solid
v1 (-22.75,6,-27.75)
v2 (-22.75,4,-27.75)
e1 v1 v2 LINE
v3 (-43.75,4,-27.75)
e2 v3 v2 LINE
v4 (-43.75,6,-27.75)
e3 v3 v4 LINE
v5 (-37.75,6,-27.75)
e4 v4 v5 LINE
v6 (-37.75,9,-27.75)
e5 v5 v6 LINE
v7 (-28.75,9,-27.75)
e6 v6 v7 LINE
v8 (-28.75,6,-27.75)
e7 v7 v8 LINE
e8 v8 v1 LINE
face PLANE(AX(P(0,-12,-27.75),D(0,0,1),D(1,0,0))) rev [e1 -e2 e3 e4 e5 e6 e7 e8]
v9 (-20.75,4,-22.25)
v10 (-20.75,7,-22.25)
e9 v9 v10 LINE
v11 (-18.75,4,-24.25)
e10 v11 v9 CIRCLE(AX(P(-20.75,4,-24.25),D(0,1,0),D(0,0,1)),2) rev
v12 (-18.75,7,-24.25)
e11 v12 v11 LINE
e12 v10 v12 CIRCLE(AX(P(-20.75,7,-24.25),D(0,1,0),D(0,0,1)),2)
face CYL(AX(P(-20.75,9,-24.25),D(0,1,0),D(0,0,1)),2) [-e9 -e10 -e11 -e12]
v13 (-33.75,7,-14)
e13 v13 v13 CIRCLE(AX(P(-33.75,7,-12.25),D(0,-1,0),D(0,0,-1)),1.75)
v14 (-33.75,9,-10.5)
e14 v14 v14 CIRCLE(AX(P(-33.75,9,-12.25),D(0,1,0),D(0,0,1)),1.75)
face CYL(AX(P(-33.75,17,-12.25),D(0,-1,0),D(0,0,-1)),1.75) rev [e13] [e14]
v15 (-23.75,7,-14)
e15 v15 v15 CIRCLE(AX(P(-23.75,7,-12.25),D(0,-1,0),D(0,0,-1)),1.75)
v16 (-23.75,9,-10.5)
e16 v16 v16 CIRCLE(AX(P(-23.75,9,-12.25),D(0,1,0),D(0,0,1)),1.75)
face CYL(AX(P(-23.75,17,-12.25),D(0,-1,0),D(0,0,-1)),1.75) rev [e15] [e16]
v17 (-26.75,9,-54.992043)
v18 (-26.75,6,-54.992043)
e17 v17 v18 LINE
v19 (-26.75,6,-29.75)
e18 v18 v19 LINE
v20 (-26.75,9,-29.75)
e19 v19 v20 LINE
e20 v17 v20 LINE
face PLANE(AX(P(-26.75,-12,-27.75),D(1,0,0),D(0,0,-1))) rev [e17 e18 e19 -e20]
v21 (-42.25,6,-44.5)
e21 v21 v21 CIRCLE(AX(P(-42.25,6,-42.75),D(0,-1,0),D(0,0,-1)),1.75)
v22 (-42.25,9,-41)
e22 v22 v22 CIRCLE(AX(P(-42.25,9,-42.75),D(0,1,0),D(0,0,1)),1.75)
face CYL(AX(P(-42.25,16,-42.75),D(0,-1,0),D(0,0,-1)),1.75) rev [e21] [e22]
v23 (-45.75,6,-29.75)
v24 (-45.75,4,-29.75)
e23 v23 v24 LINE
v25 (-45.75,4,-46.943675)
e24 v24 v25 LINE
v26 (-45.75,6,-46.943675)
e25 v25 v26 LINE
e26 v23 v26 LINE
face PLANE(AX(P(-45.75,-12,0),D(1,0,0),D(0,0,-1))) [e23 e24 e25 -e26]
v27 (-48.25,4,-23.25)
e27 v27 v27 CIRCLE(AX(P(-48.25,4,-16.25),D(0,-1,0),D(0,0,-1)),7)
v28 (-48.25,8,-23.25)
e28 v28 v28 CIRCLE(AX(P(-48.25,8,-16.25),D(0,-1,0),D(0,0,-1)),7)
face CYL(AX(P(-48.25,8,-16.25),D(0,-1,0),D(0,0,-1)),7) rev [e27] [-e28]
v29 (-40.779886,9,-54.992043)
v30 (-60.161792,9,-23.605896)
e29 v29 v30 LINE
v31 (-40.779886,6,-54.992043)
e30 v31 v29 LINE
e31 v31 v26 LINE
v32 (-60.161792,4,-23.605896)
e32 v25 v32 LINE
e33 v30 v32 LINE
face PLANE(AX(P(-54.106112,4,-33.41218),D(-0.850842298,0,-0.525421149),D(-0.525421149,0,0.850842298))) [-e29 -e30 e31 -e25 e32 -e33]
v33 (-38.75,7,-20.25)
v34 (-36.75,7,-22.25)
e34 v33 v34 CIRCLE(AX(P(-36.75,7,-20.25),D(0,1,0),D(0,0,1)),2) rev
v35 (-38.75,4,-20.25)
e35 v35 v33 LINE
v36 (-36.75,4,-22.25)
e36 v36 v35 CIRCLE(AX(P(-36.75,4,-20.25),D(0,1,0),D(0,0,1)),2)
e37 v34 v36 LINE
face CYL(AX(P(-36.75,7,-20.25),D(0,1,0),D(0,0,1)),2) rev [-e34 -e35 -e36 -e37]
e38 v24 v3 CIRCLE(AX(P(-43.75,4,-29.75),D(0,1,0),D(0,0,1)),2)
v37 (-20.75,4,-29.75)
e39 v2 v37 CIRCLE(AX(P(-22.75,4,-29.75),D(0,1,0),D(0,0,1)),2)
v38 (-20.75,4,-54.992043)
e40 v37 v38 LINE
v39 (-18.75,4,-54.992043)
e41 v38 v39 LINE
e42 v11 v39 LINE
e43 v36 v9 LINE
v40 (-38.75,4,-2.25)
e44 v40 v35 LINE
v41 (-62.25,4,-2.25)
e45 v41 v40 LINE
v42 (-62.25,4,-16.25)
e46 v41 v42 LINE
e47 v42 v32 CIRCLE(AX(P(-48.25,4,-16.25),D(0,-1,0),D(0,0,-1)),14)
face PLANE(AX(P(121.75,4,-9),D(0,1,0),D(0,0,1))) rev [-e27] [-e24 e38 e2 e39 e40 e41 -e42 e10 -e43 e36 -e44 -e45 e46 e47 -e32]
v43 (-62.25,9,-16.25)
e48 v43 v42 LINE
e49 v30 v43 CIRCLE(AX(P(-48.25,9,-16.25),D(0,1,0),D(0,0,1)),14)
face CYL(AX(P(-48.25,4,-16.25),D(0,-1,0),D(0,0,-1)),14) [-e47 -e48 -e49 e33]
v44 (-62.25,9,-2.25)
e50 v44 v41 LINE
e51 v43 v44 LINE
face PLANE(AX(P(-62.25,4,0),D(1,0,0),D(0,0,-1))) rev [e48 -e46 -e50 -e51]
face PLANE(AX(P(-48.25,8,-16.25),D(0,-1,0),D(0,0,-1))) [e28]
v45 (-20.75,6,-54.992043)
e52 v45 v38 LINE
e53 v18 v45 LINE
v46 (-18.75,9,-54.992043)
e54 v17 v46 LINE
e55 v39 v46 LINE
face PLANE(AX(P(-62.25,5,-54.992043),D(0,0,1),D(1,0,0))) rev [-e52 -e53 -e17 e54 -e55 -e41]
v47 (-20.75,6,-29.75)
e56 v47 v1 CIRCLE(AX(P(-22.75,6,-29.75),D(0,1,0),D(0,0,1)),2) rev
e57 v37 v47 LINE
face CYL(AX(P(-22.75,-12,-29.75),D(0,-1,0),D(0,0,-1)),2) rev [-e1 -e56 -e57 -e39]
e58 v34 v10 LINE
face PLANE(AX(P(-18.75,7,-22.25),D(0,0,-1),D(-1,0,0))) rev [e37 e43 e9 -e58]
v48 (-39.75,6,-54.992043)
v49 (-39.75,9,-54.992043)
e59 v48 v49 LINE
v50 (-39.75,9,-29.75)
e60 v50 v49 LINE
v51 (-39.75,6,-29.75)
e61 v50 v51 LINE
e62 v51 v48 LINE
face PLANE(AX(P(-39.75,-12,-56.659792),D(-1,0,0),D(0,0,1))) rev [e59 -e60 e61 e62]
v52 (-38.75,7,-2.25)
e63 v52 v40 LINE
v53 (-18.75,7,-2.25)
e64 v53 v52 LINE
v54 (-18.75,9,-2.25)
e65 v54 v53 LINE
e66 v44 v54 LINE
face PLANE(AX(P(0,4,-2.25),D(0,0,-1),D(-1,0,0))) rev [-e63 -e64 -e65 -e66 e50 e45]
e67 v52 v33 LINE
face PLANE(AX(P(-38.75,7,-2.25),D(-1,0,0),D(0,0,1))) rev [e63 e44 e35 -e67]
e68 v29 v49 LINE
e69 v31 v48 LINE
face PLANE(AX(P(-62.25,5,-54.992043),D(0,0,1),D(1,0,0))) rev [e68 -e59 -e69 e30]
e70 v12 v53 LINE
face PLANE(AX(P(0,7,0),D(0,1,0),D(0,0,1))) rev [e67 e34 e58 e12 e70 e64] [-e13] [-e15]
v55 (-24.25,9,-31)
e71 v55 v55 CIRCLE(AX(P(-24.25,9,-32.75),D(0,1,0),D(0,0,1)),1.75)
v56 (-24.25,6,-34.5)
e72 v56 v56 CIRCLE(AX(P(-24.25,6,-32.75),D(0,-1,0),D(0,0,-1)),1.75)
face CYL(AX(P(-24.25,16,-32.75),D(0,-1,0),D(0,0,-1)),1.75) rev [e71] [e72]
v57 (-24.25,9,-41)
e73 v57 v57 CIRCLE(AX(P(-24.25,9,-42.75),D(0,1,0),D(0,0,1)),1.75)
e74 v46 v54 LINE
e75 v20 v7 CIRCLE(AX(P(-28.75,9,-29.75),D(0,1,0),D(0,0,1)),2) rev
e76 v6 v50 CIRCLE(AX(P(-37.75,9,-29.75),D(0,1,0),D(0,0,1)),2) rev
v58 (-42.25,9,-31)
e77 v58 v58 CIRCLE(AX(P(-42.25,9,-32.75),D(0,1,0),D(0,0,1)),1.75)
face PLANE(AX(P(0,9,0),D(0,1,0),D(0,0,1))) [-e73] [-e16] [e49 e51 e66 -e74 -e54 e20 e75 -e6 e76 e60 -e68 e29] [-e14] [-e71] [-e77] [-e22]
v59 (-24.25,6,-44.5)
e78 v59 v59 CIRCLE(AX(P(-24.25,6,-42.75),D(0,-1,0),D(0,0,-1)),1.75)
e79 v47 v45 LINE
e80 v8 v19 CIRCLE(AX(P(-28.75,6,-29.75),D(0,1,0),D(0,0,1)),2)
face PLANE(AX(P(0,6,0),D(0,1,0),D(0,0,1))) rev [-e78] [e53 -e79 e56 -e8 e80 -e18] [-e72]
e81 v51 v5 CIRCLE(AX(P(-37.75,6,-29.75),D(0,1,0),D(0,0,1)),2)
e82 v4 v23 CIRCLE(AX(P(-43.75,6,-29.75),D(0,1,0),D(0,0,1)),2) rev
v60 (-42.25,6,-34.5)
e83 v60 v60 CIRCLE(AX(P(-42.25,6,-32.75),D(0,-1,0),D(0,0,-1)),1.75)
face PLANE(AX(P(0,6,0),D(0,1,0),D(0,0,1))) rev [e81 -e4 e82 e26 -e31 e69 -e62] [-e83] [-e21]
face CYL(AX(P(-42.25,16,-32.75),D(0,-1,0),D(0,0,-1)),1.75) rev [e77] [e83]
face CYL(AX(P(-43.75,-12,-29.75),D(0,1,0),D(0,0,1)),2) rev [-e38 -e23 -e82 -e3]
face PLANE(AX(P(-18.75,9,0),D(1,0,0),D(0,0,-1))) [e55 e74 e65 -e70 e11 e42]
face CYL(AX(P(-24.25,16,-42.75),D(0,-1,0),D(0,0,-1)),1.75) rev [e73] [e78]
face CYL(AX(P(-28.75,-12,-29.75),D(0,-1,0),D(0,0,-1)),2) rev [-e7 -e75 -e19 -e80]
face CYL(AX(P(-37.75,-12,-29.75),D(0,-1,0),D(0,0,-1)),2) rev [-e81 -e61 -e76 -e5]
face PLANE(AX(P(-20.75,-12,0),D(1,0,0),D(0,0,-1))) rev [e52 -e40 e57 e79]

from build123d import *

# Parameters (mm, degrees)
SKETCH_1_W                = 35
SKETCH_1_H                = 55
EXTRUDE_1_DEPTH           = 1
EXTRUDE_2_DEPTH           = 3
SKETCH_3_R                = 5
CUT_EXTRUDE_1_DEPTH       = 169.569903897
SKETCH_4_R                = 4
CUT_EXTRUDE_2_DEPTH       = 2
SKETCH_5_R                = 2
CUT_EXTRUDE_3_DEPTH       = 2
EXTRUDE_START             = 7
EXTRUDE_3_DEPTH           = 7
CUT_EXTRUDE_START         = -1.5
SKETCH_9_W                = 10
SKETCH_9_H                = 26
CUT_EXTRUDE_4_DEPTH       = 168.318874833
SKETCH_10_R               = 1.5
CUT_EXTRUDE_5_DEPTH       = 194.595583627
EXTRUDE_4_DEPTH           = 3
SKETCH_13_W               = 334.012533363
SKETCH_13_H               = 161.456209481
CUT_EXTRUDE_6_DEPTH       = 10
SKETCH_14_R               = 3.5
CUT_EXTRUDE_7_DEPTH       = 2.5
SKETCH_15_R               = 5
CUT_EXTRUDE_8_DEPTH       = 179.854165453
EXTRUDE_START_2           = 16
EXTRUDE_5_DEPTH           = 16
EXTRUDE_6_DEPTH           = 7
SKETCH_19_W               = 10
SKETCH_19_H               = 26
CUT_EXTRUDE_9_DEPTH       = 180.209193181
SKETCH_20_R               = 1.5
CUT_EXTRUDE_10_DEPTH      = 175.844216376
THREAD_1_PITCH            = 0.6
CUT_EXTRUDE_11_DEPTH      = 181.709193232
SKETCH_22_W               = 13
SKETCH_22_H               = 1.5
CUT_EXTRUDE_12_DEPTH      = 7
SKETCH_23_R               = 5
EXTRUDE_7_DEPTH           = 2
CUT_EXTRUDE_START_2       = -3
CUT_EXTRUDE_15_DEPTH      = 177.762490825
SKETCH_25_R               = 7
CUT_EXTRUDE_16_DEPTH      = 4
CUT_EXTRUDE_17_DEPTH      = 10
SKETCH_27_R               = 1.75
CUT_EXTRUDE_18_DEPTH      = 10
CUT_EXTRUDE_19_DEPTH      = 180.762490825
CUT_EXTRUDE_19_DEPTH_BACK = 60
CUT_EXTRUDE_20_DEPTH      = 2
SKETCH_30_W               = 11.653427307
SKETCH_30_H               = 7.287785495
CUT_EXTRUDE_21_DEPTH      = 193.522031886
SKETCH_31_W               = 3.751946438
SKETCH_31_H               = 6.76496914
CUT_EXTRUDE_22_DEPTH      = 10
SKETCH_32_R               = 1
CUT_EXTRUDE_23_DEPTH      = 10
SKETCH_33_R               = 6.599468503
EXTRUDE_8_DEPTH           = 1
SKETCH_35_W               = 76.825944062
SKETCH_35_H               = 20.911958218
CUT_EXTRUDE_24_DEPTH      = 193.102403623
SKETCH_36_W               = 20
SKETCH_36_H               = 20
CUT_EXTRUDE_25_DEPTH      = 3
SKETCH_37_R               = 1.75
CUT_EXTRUDE_26_DEPTH      = 10
FILLET_1_R                = 2


with BuildPart() as part:
    # Sketch 1 → 凸台-拉伸1 (new body)
    with BuildSketch(Plane(origin=(0, 0, 0), x_dir=(1, 0, 0), z_dir=(0, 1, 0))):
        Rectangle(SKETCH_1_W, SKETCH_1_H)
    extrude(amount=EXTRUDE_1_DEPTH)

    # 草图2 → 凸台-拉伸2 (add)
    with BuildSketch(Plane(origin=(0, 1, 0), x_dir=(1, 0, 0), z_dir=(0, 1, 0))):
        with BuildLine():
            Line((106.75, -2.25), (106.75, 2.25))
            Line((106.75, 2.25), (121.75, 2.25))
            ThreePointArc((121.75, 2.25), (122.922125199, 2.352547667), (124.058635967, 2.65707481))
            Line((124.058635967, 2.65707481), (154.058635967, 13.576181838))
            ThreePointArc((154.058635967, 13.576181838), (158.397452333, 21.091232227), (151.75, 26.669107028))
            Line((151.75, 26.669107028), (-31.447415548, 57.101298968))
            ThreePointArc((-31.447415548, 57.101298968), (-37.800418235, 56.264673928), (-42.609265279, 52.029632639))
            Line((-42.609265279, 52.029632639), (-60.161792173, 23.605896086))
            ThreePointArc((-60.161792173, 23.605896086), (-61.717833724, 20.073278016), (-62.25, 16.25))
            Line((-62.25, 16.25), (-62.25, -16.25))
            ThreePointArc((-62.25, -16.25), (-61.717833724, -20.073278016), (-60.161792173, -23.605896086))
            Line((-60.161792173, -23.605896086), (-42.609265279, -52.029632639))
            ThreePointArc((-42.609265279, -52.029632639), (-37.800418235, -56.264673928), (-31.447415548, -57.101298968))
            Line((-31.447415548, -57.101298968), (151.75, -26.669107028))
            ThreePointArc((151.75, -26.669107028), (158.397452333, -21.091232227), (154.058635967, -13.576181838))
            Line((154.058635967, -13.576181838), (124.058635967, -2.65707481))
            ThreePointArc((124.058635967, -2.65707481), (122.922125199, -2.352547667), (121.75, -2.25))
            Line((121.75, -2.25), (106.75, -2.25))
        make_face()
    extrude(amount=EXTRUDE_2_DEPTH)

    # 草图3 → 切除-拉伸1 (cut, through all)
    with BuildSketch(Plane(origin=(0, 4, 0), x_dir=(1, 0, 0), z_dir=(0, 1, 0))):
        with Locations(Location((-48.25, 16.25, 0), (0, 0, 270))):
            Circle(SKETCH_3_R)
        with Locations(Location((-48.25, -16.25, 0), (0, 0, 270))):
            Circle(SKETCH_3_R)
    extrude(amount=-CUT_EXTRUDE_1_DEPTH, mode=Mode.SUBTRACT)

    # 草图4 → 切除-拉伸2 (cut)
    with BuildSketch(Plane(origin=(0, 4, 0), x_dir=(1, 0, 0), z_dir=(0, 1, 0))):
        with Locations(Location((-33.25, 46.25, 0), (0, 0, 270))):
            Circle(SKETCH_4_R)
        with Locations(Location((-33.25, -46.25, 0), (0, 0, 270))):
            Circle(SKETCH_4_R)
    extrude(amount=-CUT_EXTRUDE_2_DEPTH, mode=Mode.SUBTRACT)

    # 草图5 → 切除-拉伸3 (cut)
    with BuildSketch(Plane(origin=(0, 4, 0), x_dir=(1, 0, 0), z_dir=(0, 1, 0))):
        with Locations(Location((121.75, 9, 0), (0, 0, 270))):
            Circle(SKETCH_5_R)
        with Locations(Location((121.75, -9, 0), (0, 0, 270))):
            Circle(SKETCH_5_R)
        with Locations(Location((151.75, 19.919107028, 0), (0, 0, 270))):
            Circle(SKETCH_5_R)
        with Locations(Location((151.75, -19.919107028, 0), (0, 0, 270))):
            Circle(SKETCH_5_R)
    extrude(amount=-CUT_EXTRUDE_3_DEPTH, mode=Mode.SUBTRACT)

    # 草图8 → 凸台-拉伸3 (add)
    with BuildSketch(Plane.XZ.offset(-1).offset(EXTRUDE_START)):
        with BuildLine():
            Line((-26.75, -26.25), (-39.75, -26.25))
            Line((-39.75, -26.25), (-39.75, -55.124119675))
            ThreePointArc((-39.75, -55.124119675), (-35.798281322, -56.950759894), (-31.447415548, -57.101298968))
            Line((-31.447415548, -57.101298968), (-26.75, -56.320978726))
            Line((-26.75, -56.320978726), (-26.75, -26.25))
        make_face()
    extrude_3 = extrude(amount=-EXTRUDE_3_DEPTH)

    # 镜向1: 凸台-拉伸3 across plane
    add(extrude_3.mirror(Plane.XY))

    # 草图9 → 切除-拉伸4 (cut, through all)
    with BuildSketch(Plane.XZ.offset(6).offset(CUT_EXTRUDE_START)):
        with Locations((-33.25, -40.75)):
            Rectangle(SKETCH_9_W, SKETCH_9_H)
    cut_extrude_4 = extrude(amount=-CUT_EXTRUDE_4_DEPTH, mode=Mode.SUBTRACT)

    # 镜向2: 切除-拉伸4 across plane
    add(cut_extrude_4.mirror(Plane.XY), mode=Mode.SUBTRACT)

    # 草图10 → 切除-拉伸5 (cut, through all)
    with BuildSketch(Plane.XY.offset(-53.75)):
        with Locations((-33.25, -1.5)):
            Circle(SKETCH_10_R)
    cut_extrude_5 = extrude(amount=-CUT_EXTRUDE_5_DEPTH, mode=Mode.SUBTRACT)

    # 镜向3: 切除-拉伸5 across plane
    add(cut_extrude_5.mirror(Plane.XY), mode=Mode.SUBTRACT)

    # 草图12 → 凸台-拉伸4 (add)
    with BuildSketch(Plane(origin=(0, 4, 0), x_dir=(1, 0, 0), z_dir=(0, 1, 0))):
        with BuildLine():
            Line((152.536154407, 34.648141662), (-30.136445037, 64.993152763))
            ThreePointArc((-30.136445037, 64.993152763), (-32.296727103, 65.226071005), (-34.469475839, 65.210824842))
            Line((-34.469475839, 65.210824842), (-60.161792173, 23.605896086))
            ThreePointArc((-60.161792173, 23.605896086), (-61.717833724, 20.073278016), (-62.25, 16.25))
            Line((-62.25, 16.25), (-62.25, 2.25))
            Line((-62.25, 2.25), (121.75, 2.25))
            ThreePointArc((121.75, 2.25), (122.922125199, 2.352547667), (124.058635967, 2.65707481))
            Line((124.058635967, 2.65707481), (166.382589153, 18.061733966))
            ThreePointArc((166.382589153, 18.061733966), (163.073058037, 29.371665237), (152.536154407, 34.648141662))
        make_face()
    extrude(amount=EXTRUDE_4_DEPTH)

    # 草图13 → 切除-拉伸6 (cut)
    with BuildSketch(Plane.XZ.offset(-4)):
        with Locations((47.836319436, 6.16656882)):
            Rectangle(SKETCH_13_W, SKETCH_13_H)
    extrude(amount=CUT_EXTRUDE_6_DEPTH, mode=Mode.SUBTRACT)

    # 草图14 → 切除-拉伸7 (cut)
    with BuildSketch(Plane.XZ.offset(-4)):
        with Locations(Location((151.75, -19.919107028, 0), (0, 0, 270))):
            Circle(SKETCH_14_R)
        with Locations(Location((121.75, -9, 0), (0, 0, 270))):
            Circle(SKETCH_14_R)
    extrude(amount=-CUT_EXTRUDE_7_DEPTH, mode=Mode.SUBTRACT)

    # 草图15 → 切除-拉伸8 (cut, through all)
    with BuildSketch(Plane.XZ.offset(-4)):
        with Locations(Location((-48.25, -16.25, 0), (0, 0, 270))):
            Circle(SKETCH_15_R)
    extrude(amount=-CUT_EXTRUDE_8_DEPTH, mode=Mode.SUBTRACT)

    # 草图17 → 凸台-拉伸5 (add)
    with BuildSketch(Plane.XZ.offset(-4).offset(EXTRUDE_START_2)):
        with BuildLine():
            Line((-30.628058978, -62.03370759), (152.218782473, -31.659751942))
            ThreePointArc((152.218782473, -31.659751942), (161.216553887, -26.879484712), (163.096310198, -16.865626245))
            Line((163.096310198, -16.865626245), (166.382589153, -18.061733966))
            ThreePointArc((166.382589153, -18.061733966), (163.073058037, -29.371665237), (152.536154407, -34.648141662))
            Line((152.536154407, -34.648141662), (-30.136445037, -64.993152763))
            ThreePointArc((-30.136445037, -64.993152763), (-32.296727103, -65.226071005), (-34.469475839, -65.210824842))
            Line((-34.469475839, -65.210824842), (-36.504423199, -61.915526791))
            ThreePointArc((-36.504423199, -61.915526791), (-33.571714316, -62.246765295), (-30.628058978, -62.03370759))
        make_face()
    extrude(amount=-EXTRUDE_5_DEPTH)

    # 草图18 → 凸台-拉伸6 (add)
    with BuildSketch(Plane(origin=(0, 7, 0), x_dir=(1, 0, 0), z_dir=(0, 1, 0))):
        with BuildLine():
            Line((-39.75, 56.65979236), (-39.75, 26.25))
            Line((-39.75, 26.25), (-26.75, 26.25))
            Line((-26.75, 26.25), (-26.75, 64.430606916))
            Line((-26.75, 64.430606916), (-30.136445037, 64.993152763))
            ThreePointArc((-30.136445037, 64.993152763), (-32.296727103, 65.226071005), (-34.469475839, 65.210824842))
            Line((-34.469475839, 65.210824842), (-39.75, 56.65979236))
        make_face()
    extrude(amount=EXTRUDE_6_DEPTH)

    # 草图19 → 切除-拉伸9 (cut, through all)
    with BuildSketch(Plane(origin=(0, 14, 0), x_dir=(1, 0, 0), z_dir=(0, 1, 0)).offset(CUT_EXTRUDE_START)):
        with Locations((-33.25, 40.75)):
            Rectangle(SKETCH_19_W, SKETCH_19_H)
    extrude(amount=-CUT_EXTRUDE_9_DEPTH, mode=Mode.SUBTRACT)

    # 草图20 → 切除-拉伸10 (cut, through all)
    with BuildSketch(Plane.XY.offset(-53.75)):
        with Locations((-33.25, 9.5)):
            Circle(SKETCH_20_R)
    extrude(amount=-CUT_EXTRUDE_10_DEPTH, mode=Mode.SUBTRACT)

    # 螺纹线1: the profile of Sketch 1 2 profile screwed along a right-hand helix of 25 turns, 6 arcs to a turn; built about Z, then put on its axis
    thread_1_z = Axis((0, 0, 0), (0, 0, 1))
    thread_1_corners = [(1.4997, 0, -0.000173205), (1.824759525, 0, 0.187499999), (1.824759525, 0, 0.262499999), (1.4997, 0, 0.450173203)]
    with BuildLine(mode=Mode.PRIVATE) as thread_1_profile:
        Line(thread_1_corners[0], thread_1_corners[1])
        Line(thread_1_corners[1], thread_1_corners[2])
        Line(thread_1_corners[2], thread_1_corners[3])
        Line(thread_1_corners[3], thread_1_corners[0])
    thread_1_cap = Face(thread_1_profile.wire())
    thread_1_turn_angles = [0, 30, 60, 90, 120, 150, 180, 210, 240, 270, 300, 330, 360]
    thread_1_turn_weights = [1, 0.8660254037844387, 1, 0.8660254037844387, 1, 0.8660254037844387, 1, 0.8660254037844387, 1, 0.8660254037844387, 1, 0.8660254037844387, 1]
    thread_1_turn_rails = [Edge.make_bspline([Vector(p[0], p[1], 0).rotate(thread_1_z, thread_1_turn_angles[k]) / thread_1_turn_weights[k] + Vector(0, 0, p[2] + THREAD_1_PITCH * thread_1_turn_angles[k] / 360) for k in range(13)], [0, 0, 0, 1, 1, 2, 2, 3, 3, 4, 4, 5, 5, 6, 6, 6], 2, thread_1_turn_weights) for p in thread_1_corners]
    thread_1_turn_sides = [Face.make_surface_from_curves(thread_1_turn_rails[p[0]], thread_1_turn_rails[p[1]]) for p in [(0, 1), (1, 2), (2, 3), (3, 0)]]
    thread_1 = Plane(origin=(-33.25, 9.5, -53.75), x_dir=(-1, 0, 0), z_dir=(0, 0, -1)) * Solid(Shell([*[p.moved(Location((0, 0, THREAD_1_PITCH * i))) for i in range(25) for p in thread_1_turn_sides], thread_1_cap, thread_1_cap.rotate(thread_1_z, 9000).moved(Location((0, 0, THREAD_1_PITCH * 9000 / 360)))]))
    add(thread_1, mode=Mode.SUBTRACT)

    # 草图21 → 切除-拉伸11 (cut, through all)
    with BuildSketch(Plane(origin=(0, 14, 0), x_dir=(1, 0, 0), z_dir=(0, 1, 0))):
        with BuildLine():
            Line((-39.75, 27.75), (-26.75, 27.75))
            Line((-26.75, 27.75), (-26.75, 64.430606916))
            Line((-26.75, 64.430606916), (-30.136445037, 64.993152763))
            ThreePointArc((-30.136445037, 64.993152763), (-32.296727103, 65.226071005), (-34.469475839, 65.210824842))
            Line((-34.469475839, 65.210824842), (-39.75, 56.65979236))
            Line((-39.75, 56.65979236), (-39.75, 27.75))
        make_face()
    extrude(amount=-CUT_EXTRUDE_11_DEPTH, mode=Mode.SUBTRACT)

    # 草图22 → 切除-拉伸12 (cut)
    with BuildSketch(Plane(origin=(0, 14, 0), x_dir=(1, 0, 0), z_dir=(0, 1, 0))):
        with Locations((-33.25, 27)):
            Rectangle(SKETCH_22_W, SKETCH_22_H)
    extrude(amount=-CUT_EXTRUDE_12_DEPTH, mode=Mode.SUBTRACT)

    # 草图23 → 凸台-拉伸7 (add)
    with BuildSketch(Plane(origin=(0, 7, 0), x_dir=(1, 0, 0), z_dir=(0, 1, 0))):
        with BuildLine():
            Line((-26.75, 27.75), (-39.75, 27.75))
            Line((-39.75, 27.75), (-39.75, 56.65979236))
            Line((-39.75, 56.65979236), (-60.161792173, 23.605896086))
            ThreePointArc((-60.161792173, 23.605896086), (-61.717833724, 20.073278016), (-62.25, 16.25))
            Line((-62.25, 16.25), (-62.25, 2.25))
            Line((-62.25, 2.25), (-18.75, 2.25))
            Line((-18.75, 2.25), (-18.75, 63.101671489))
            Line((-18.75, 63.101671489), (-26.75, 64.430606916))
            Line((-26.75, 64.430606916), (-26.75, 27.75))
        make_face()
        with Locations(Location((-48.25, 16.25, 0), (0, 0, 90))):
            Circle(SKETCH_23_R, mode=Mode.SUBTRACT)
    extrude(amount=EXTRUDE_7_DEPTH)

    # 草图24 → 切除-拉伸15 (cut, through all)
    with BuildSketch(Plane(origin=(0, 9, 0), x_dir=(1, 0, 0), z_dir=(0, 1, 0)).offset(CUT_EXTRUDE_START_2)):
        Polygon((-45.75, 46.034880297), (-45.75, 27.75), (-39.75, 27.75), (-39.75, 56.65979236), (-45.75, 46.943674541), align=None)
        Polygon((-26.75, 64.430606916), (-26.75, 27.75), (-20.75, 27.75), (-20.75, 63.433905346), align=None)
    extrude(amount=-CUT_EXTRUDE_15_DEPTH, mode=Mode.SUBTRACT)

    # 草图25 → 切除-拉伸16 (cut)
    with BuildSketch(Plane.XZ.offset(-4)):
        with Locations(Location((-48.25, -16.25, 0), (0, 0, 270))):
            Circle(SKETCH_25_R)
    extrude(amount=-CUT_EXTRUDE_16_DEPTH, mode=Mode.SUBTRACT)

    # 草图26 → 切除-拉伸17 (cut)
    with BuildSketch(Plane(origin=(0, 7, 0), x_dir=(1, 0, 0), z_dir=(0, 1, 0))):
        with BuildLine():
            Line((3.5, 31.25), (3.5, 35.25))
            ThreePointArc((3.5, 35.25), (1.75, 37), (0, 35.25))
            Line((0, 35.25), (0, 31.25))
            ThreePointArc((0, 31.25), (1.75, 29.5), (3.5, 31.25))
        make_face()
        with BuildLine():
            ThreePointArc((41.75, 18), (40.512563133, 17.487436867), (40, 16.25))
            Line((40, 16.25), (47.5, 16.25))
            ThreePointArc((47.5, 16.25), (46.987436867, 17.487436867), (45.75, 18))
            Line((45.75, 18), (41.75, 18))
        make_face()
        with BuildLine():
            Line((47.5, 16.25), (40, 16.25))
            ThreePointArc((40, 16.25), (40.512563133, 15.012563133), (41.75, 14.5))
            Line((41.75, 14.5), (45.75, 14.5))
            ThreePointArc((45.75, 14.5), (46.987436867, 15.012563133), (47.5, 16.25))
        make_face()
        with BuildLine():
            Line((81.75, 14.5), (85.75, 14.5))
            ThreePointArc((85.75, 14.5), (87.5, 16.25), (85.75, 18))
            Line((85.75, 18), (81.75, 18))
            ThreePointArc((81.75, 18), (80, 16.25), (81.75, 14.5))
        make_face()
        with BuildLine():
            Line((1.75, 18), (5.75, 18))
            ThreePointArc((5.75, 18), (7.5, 16.25), (5.75, 14.5))
            Line((5.75, 14.5), (1.75, 14.5))
            ThreePointArc((1.75, 14.5), (0, 16.25), (1.75, 18))
        make_face()
    extrude(amount=-CUT_EXTRUDE_17_DEPTH, mode=Mode.SUBTRACT)

    # 草图27 → 切除-拉伸18 (cut)
    with BuildSketch(Plane.XZ.offset(-6)):
        with Locations(Location((-42.25, -32.75, 0), (0, 0, 270))):
            Circle(SKETCH_27_R)
        with Locations(Location((-42.25, -42.75, 0), (0, 0, 270))):
            Circle(SKETCH_27_R)
        with Locations(Location((-24.25, -32.75, 0), (0, 0, 270))):
            Circle(SKETCH_27_R)
        with Locations(Location((-24.25, -42.75, 0), (0, 0, 270))):
            Circle(SKETCH_27_R)
    extrude(amount=-CUT_EXTRUDE_18_DEPTH, mode=Mode.SUBTRACT)

    # 草图28 → 切除-拉伸19 (cut, two sides: drawn at the far end of the back side and taken through both)
    with BuildSketch(Plane.XZ.offset(12).offset(-CUT_EXTRUDE_19_DEPTH_BACK)):
        with BuildLine():
            Line((152.218782473, -31.659751942), (-20.75, -60.392794775))
            Line((-20.75, -60.392794775), (-20.75, -63.433905346))
            Line((-20.75, -63.433905346), (152.536154407, -34.648141662))
            ThreePointArc((152.536154407, -34.648141662), (163.073058037, -29.371665237), (166.382589153, -18.061733966))
            Line((166.382589153, -18.061733966), (163.096310198, -16.865626245))
            ThreePointArc((163.096310198, -16.865626245), (161.216553887, -26.879484712), (152.218782473, -31.659751942))
        make_face()
        Polygon((-26.75, -61.389496345), (-26.75, -64.430606916), (-20.75, -63.433905346), (-20.75, -60.392794775), align=None)
    extrude(amount=CUT_EXTRUDE_19_DEPTH + CUT_EXTRUDE_19_DEPTH_BACK, mode=Mode.SUBTRACT)

    # 草图29 → 切除-拉伸20 (cut)
    with BuildSketch(Plane.XZ.offset(-4).offset(CUT_EXTRUDE_START_2)):
        with BuildLine():
            Line((-18.75, -60.060560918), (152.218782473, -31.659751942))
            ThreePointArc((152.218782473, -31.659751942), (161.216553887, -26.879484712), (163.096310198, -16.865626245))
            Line((163.096310198, -16.865626245), (154.058635967, -13.576181838))
            ThreePointArc((154.058635967, -13.576181838), (158.397452333, -21.091232227), (151.75, -26.669107028))
            Line((151.75, -26.669107028), (-18.75, -54.9920433))
            Line((-18.75, -54.9920433), (-18.75, -60.060560918))
        make_face()
    extrude(amount=CUT_EXTRUDE_20_DEPTH, mode=Mode.SUBTRACT)

    # 草图30 → 切除-拉伸21 (cut, through all)
    with BuildSketch(Plane(origin=(-18.75, 0, 0), x_dir=(0, 0, -1), z_dir=(1, 0, 0))):
        with Locations((60.818756954, 8.643892748)):
            Rectangle(SKETCH_30_W, SKETCH_30_H)
    extrude(amount=-CUT_EXTRUDE_21_DEPTH, mode=Mode.SUBTRACT)

    # 草图31 → 切除-拉伸22 (cut)
    with BuildSketch(Plane(origin=(0, 5, 0), x_dir=(1, 0, 0), z_dir=(0, 1, 0))):
        with Locations((-20.625973219, 58.37452787)):
            Rectangle(SKETCH_31_W, SKETCH_31_H)
    extrude(amount=-CUT_EXTRUDE_22_DEPTH, mode=Mode.SUBTRACT)

    # 草图32 → 切除-拉伸23 (cut)
    with BuildSketch(Plane(origin=(0, 5, 0), x_dir=(1, 0, 0), z_dir=(0, 1, 0))):
        with BuildLine():
            ThreePointArc((11.886282262, 52.603213934), (10.968496238, 53.599828635), (9.899800538, 52.767085248))
            Line((9.899800538, 52.767085248), (11.872763986, 52.43934262))
            ThreePointArc((11.872763986, 52.43934262), (11.882896963, 52.520999958), (11.886282262, 52.603213934))
        make_face()
        with BuildLine():
            Line((11.872763986, 52.43934262), (9.899800538, 52.767085248))
            ThreePointArc((9.899800538, 52.767085248), (10.722410948, 51.61673221), (11.872763986, 52.43934262))
        make_face()
        with BuildLine():
            ThreePointArc((51.345551236, 46.04836138), (50.427765212, 47.044976081), (49.359069512, 46.212232694))
            Line((49.359069512, 46.212232694), (51.332032961, 45.884490066))
            ThreePointArc((51.332032961, 45.884490066), (51.342165937, 45.966147404), (51.345551236, 46.04836138))
        make_face()
        with BuildLine():
            Line((51.332032961, 45.884490066), (49.359069512, 46.212232694))
            ThreePointArc((49.359069512, 46.212232694), (50.181679923, 45.061879655), (51.332032961, 45.884490066))
        make_face()
        with Locations(Location((89.804820211, 39.493508826, 0), (0, 0, 270))):
            Circle(SKETCH_32_R)
        with Locations(Location((129.264089185, 32.938656271, 0), (0, 0, 270))):
            Circle(SKETCH_32_R)
    extrude(amount=-CUT_EXTRUDE_23_DEPTH, mode=Mode.SUBTRACT)

    # 草图33 → 凸台-拉伸8 (add)
    with BuildSketch(Plane(origin=(0, 9, 0), x_dir=(1, 0, 0), z_dir=(0, 1, 0))):
        with Locations((-48.25, 16.25)):
            Circle(SKETCH_33_R)
    extrude(amount=-EXTRUDE_8_DEPTH)

    # 草图35 → 切除-拉伸24 (cut, through all)
    with BuildSketch(Plane(origin=(-18.75, 0, 0), x_dir=(0, 0, -1), z_dir=(1, 0, 0))):
        with Locations((36.542659939, 3.314485228)):
            Rectangle(SKETCH_35_W, SKETCH_35_H)
    extrude(amount=CUT_EXTRUDE_24_DEPTH, mode=Mode.SUBTRACT)

    # 草图36 → 切除-拉伸25 (cut)
    with BuildSketch(Plane.XZ.offset(-4)):
        with Locations((-28.75, -12.25)):
            Rectangle(SKETCH_36_W, SKETCH_36_H)
    extrude(amount=-CUT_EXTRUDE_25_DEPTH, mode=Mode.SUBTRACT)

    # 草图37 → 切除-拉伸26 (cut)
    with BuildSketch(Plane.XZ.offset(-7)):
        with BuildLine():
            ThreePointArc((-25.5, -12.25), (-23.75, -14), (-22, -12.25))
            Line((-22, -12.25), (-25.5, -12.25))
        make_face()
        with BuildLine():
            Line((-25.5, -12.25), (-22, -12.25))
            ThreePointArc((-22, -12.25), (-23.75, -10.5), (-25.5, -12.25))
        make_face()
        with Locations(Location((-33.75, -12.25, 0), (0, 0, 270))):
            Circle(SKETCH_37_R)
    extrude(amount=-CUT_EXTRUDE_26_DEPTH, mode=Mode.SUBTRACT)

    # 圆角1
    fillet_1_edges = [part.edges().sort_by_distance(p)[0] for p in [
        (-39.75, 7.5, -27.75),
        (-26.75, 7.5, -27.75),
        (-45.75, 5, -27.75),
        (-20.75, 5, -27.75),
        (-18.75, 5.5, -22.25),
        (-38.75, 5.5, -22.25),
    ]]
    fillet(fillet_1_edges, radius=FILLET_1_R)


solid = part.part
